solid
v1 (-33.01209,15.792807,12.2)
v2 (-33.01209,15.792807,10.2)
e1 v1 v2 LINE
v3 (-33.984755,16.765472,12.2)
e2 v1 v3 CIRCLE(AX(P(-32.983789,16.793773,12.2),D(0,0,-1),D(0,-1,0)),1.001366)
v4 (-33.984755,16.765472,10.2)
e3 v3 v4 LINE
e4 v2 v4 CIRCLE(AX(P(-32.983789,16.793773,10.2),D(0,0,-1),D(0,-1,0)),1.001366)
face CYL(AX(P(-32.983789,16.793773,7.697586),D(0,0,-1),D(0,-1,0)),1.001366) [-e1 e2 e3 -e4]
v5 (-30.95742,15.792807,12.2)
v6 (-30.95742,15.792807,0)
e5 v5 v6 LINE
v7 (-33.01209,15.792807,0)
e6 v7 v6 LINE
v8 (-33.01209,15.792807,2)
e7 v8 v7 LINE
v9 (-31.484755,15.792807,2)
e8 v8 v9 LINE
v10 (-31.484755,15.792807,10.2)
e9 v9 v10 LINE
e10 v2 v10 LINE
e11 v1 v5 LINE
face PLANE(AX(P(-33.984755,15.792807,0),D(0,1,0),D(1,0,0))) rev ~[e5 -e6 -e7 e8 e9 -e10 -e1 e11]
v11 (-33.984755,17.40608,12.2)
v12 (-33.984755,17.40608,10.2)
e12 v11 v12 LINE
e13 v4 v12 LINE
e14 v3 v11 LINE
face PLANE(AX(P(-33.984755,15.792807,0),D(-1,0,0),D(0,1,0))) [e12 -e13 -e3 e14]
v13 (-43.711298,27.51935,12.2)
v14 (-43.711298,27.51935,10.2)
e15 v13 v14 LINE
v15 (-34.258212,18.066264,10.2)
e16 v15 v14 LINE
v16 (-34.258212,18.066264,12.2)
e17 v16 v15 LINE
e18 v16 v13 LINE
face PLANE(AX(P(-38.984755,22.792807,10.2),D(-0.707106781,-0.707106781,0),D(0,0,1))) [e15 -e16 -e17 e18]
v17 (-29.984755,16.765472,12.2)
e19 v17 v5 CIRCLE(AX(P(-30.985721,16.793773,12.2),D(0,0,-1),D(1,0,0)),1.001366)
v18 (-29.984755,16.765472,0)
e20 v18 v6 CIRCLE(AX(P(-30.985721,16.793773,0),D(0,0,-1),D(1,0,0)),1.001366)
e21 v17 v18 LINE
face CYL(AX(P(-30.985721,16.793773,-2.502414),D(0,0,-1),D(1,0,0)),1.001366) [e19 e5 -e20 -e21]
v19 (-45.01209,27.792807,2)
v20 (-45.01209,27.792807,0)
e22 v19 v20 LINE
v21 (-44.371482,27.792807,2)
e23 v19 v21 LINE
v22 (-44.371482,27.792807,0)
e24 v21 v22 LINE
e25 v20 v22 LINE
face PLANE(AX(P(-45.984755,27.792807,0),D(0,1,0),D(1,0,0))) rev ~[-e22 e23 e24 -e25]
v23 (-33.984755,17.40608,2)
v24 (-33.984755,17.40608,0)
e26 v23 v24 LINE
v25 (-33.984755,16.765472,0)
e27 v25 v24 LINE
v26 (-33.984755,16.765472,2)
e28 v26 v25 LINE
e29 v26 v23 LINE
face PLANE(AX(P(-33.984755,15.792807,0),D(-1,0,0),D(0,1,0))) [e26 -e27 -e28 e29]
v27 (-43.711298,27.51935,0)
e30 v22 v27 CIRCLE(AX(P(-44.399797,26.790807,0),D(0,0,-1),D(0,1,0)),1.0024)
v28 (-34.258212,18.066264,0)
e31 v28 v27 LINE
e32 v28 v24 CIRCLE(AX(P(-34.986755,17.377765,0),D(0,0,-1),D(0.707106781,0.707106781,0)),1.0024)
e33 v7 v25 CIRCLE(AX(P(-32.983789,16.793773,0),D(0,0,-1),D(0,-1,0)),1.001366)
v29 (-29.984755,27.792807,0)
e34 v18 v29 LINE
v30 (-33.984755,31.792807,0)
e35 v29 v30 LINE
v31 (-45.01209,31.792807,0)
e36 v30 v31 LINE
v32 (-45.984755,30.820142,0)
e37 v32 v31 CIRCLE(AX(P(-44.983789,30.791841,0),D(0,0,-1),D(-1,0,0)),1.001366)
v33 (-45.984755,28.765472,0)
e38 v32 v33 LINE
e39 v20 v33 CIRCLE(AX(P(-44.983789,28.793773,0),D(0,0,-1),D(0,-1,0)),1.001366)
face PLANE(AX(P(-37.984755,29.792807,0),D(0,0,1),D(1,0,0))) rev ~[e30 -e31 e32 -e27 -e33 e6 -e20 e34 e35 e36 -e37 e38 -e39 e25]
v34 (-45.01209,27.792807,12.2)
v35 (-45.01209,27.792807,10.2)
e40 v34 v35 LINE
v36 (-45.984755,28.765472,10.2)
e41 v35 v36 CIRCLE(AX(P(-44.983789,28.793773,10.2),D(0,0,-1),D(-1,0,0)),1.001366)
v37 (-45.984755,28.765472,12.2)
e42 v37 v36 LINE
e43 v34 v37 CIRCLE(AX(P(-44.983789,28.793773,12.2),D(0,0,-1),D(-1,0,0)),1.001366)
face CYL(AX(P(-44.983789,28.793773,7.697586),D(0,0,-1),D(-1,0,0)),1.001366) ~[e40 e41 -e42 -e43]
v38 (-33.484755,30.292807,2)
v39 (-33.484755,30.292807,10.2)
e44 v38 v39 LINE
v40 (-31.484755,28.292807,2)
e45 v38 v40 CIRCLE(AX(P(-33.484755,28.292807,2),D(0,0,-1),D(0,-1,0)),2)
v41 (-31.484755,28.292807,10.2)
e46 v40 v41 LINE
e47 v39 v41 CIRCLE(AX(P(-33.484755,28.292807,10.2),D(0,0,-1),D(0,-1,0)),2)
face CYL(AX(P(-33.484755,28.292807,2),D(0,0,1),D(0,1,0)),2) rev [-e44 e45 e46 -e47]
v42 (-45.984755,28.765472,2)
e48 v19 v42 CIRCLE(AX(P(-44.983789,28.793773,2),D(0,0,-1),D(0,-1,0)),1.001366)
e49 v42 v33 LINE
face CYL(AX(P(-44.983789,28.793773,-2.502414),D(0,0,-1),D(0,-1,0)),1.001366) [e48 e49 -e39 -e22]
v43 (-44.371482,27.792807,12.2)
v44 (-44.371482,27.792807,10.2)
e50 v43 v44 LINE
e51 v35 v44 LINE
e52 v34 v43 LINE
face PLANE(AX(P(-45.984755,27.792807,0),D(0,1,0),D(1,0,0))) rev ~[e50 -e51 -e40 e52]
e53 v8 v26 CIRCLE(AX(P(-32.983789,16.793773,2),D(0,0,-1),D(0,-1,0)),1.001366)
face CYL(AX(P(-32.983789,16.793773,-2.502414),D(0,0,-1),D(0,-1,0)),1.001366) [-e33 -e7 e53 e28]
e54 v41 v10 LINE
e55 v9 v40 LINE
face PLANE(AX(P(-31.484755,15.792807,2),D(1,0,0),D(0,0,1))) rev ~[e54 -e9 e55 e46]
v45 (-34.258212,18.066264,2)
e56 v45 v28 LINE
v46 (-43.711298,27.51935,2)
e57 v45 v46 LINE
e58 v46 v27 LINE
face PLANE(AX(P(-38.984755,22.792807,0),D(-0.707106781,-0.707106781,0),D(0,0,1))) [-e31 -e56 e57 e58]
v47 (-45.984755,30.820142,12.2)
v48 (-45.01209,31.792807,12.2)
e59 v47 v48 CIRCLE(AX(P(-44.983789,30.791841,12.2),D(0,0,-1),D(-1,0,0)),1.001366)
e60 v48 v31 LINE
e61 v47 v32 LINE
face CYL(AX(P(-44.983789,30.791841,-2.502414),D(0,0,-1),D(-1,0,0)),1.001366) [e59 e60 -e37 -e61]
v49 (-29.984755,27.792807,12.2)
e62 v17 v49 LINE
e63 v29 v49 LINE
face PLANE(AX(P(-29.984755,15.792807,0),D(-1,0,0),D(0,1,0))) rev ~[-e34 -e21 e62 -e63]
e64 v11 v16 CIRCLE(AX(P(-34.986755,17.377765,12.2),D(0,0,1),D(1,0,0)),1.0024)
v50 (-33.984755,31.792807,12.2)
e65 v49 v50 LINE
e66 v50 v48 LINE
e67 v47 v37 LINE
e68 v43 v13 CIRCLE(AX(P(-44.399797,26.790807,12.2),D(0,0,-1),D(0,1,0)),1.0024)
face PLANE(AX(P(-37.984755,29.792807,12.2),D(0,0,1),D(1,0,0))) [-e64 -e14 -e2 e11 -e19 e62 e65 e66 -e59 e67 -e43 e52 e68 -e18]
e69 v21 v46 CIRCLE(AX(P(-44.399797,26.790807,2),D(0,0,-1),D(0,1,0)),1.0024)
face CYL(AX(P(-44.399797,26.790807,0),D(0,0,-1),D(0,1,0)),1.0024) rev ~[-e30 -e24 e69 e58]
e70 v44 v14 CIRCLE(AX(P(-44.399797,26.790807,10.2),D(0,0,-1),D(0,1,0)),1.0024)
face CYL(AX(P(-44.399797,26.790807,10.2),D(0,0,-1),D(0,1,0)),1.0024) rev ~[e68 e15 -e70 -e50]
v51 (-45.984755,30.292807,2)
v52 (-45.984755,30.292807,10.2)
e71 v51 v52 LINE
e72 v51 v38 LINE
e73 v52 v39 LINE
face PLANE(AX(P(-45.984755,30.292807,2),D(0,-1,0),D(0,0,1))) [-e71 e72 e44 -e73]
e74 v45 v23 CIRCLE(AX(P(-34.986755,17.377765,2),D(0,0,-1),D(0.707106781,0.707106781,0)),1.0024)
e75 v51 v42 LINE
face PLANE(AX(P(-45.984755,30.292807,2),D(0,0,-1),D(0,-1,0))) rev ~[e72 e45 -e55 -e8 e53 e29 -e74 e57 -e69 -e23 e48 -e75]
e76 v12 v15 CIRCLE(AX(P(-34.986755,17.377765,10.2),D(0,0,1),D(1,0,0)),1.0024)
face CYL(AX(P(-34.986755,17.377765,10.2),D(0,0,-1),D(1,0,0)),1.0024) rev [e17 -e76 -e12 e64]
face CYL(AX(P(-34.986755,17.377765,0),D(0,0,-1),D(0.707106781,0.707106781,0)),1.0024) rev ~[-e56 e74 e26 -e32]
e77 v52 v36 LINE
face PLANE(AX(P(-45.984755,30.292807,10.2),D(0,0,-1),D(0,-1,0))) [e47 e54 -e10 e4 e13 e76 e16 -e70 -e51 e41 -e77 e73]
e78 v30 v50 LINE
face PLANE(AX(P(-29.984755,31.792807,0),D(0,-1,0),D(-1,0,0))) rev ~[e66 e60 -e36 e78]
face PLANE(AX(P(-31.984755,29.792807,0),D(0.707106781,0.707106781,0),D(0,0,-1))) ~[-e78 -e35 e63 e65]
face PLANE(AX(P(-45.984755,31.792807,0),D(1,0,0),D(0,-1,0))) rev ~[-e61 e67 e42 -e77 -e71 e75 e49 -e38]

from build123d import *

# Parameters (mm, degrees)
F0_W        = 4
F0_H        = 12
F1_DEPTH    = 12.2
F2_W        = 2.5
F2_H        = 8.2
F3_DEPTH    = 14.5
F4_W        = 2.5
F4_H        = 8.2
F5_DEPTH    = 13.2
F6_SIZE     = 10
F7_R        = 2
F8_SIZE     = 4
F9_T1_DEPTH = 2
F9_T3_DEPTH = 2
F9_T5_DEPTH = 7.0048288267
F9_T7_DEPTH = 17.2048288267
F9_T9_DEPTH = 7.0048288267


# Not quite as in the source:
# - a fillet or chamfer that OpenCascade refuses, or shapes differently, is made with other operations: its cross-section is extruded or revolved along the edge and cut away or added


with BuildPart() as f1:
    # F0 (on Top) → F1 (new body)
    with BuildSketch(Plane.XY):
        Polygon((-29.984754981, 31.7928069385), (-45.984754981, 31.7928069385), (-45.984754981, 27.7928069385), (-33.984754981, 27.7928069385), (-29.984754981, 27.7928069385), align=None)
        with Locations((-31.984754981, 21.7928069385)):
            Rectangle(F0_W, F0_H)
    extrude(amount=F1_DEPTH)

    # F2 (on face) → F3 (cut)
    with BuildSketch(Plane(origin=(-45.984754981, 0, 0), x_dir=(0, -1, 0), z_dir=(-1, 0, 0))):
        with Locations((-29.0428069385, 6.1)):
            Rectangle(F2_W, F2_H)
    extrude(amount=-F3_DEPTH, mode=Mode.SUBTRACT)

    # F4 (on face) → F5 (cut)
    with BuildSketch(Plane.XZ.offset(-15.7928069385)):
        with Locations((-32.734754981, 6.1)):
            Rectangle(F4_W, F4_H)
    extrude(amount=-F5_DEPTH, mode=Mode.SUBTRACT)

    # F6
    f6_edges = [f1.edges().sort_by_distance(p)[0] for p in [
        (-33.984755, 27.792807, 1),
        (-33.984755, 27.792807, 11.2),
    ]]
    chamfer(f6_edges, length=F6_SIZE)

    # F7
    f7_edges = [f1.edges().sort_by_distance(p)[0] for p in [
        (-31.484755, 30.292807, 6.1),
    ]]
    fillet(f7_edges, radius=F7_R)

    # F8
    f8_edges = [f1.edges().sort_by_distance(p)[0] for p in [
        (-29.984755, 31.792807, 6.1),
    ]]
    chamfer(f8_edges, length=F8_SIZE)

    # F9: fillet of radius 1 on 14 edges, made by hand

    # F9_s2 → F9_t1 (join)
    with BuildSketch(Plane.XY):
        with BuildLine():
            ThreePointArc((-44.3997969705, 27.7932069385), (-44.0161950979, 27.7169037819), (-43.690993133, 27.4996107759))
            Line((-43.690993133, 27.4996107759), (-43.6201127493, 27.5704911597))
            ThreePointArc((-43.6201127493, 27.5704911597), (-43.7671350946, 27.7169478196), (-43.9138745973, 27.8636873222))
            Line((-43.9138745973, 27.8636873222), (-43.984754981, 27.8930469385))
            ThreePointArc((-43.984754981, 27.8930469385), (-44.1922759758, 27.8930469385), (-44.3997969705, 27.8934469385))
            Line((-44.3997969705, 27.8934469385), (-44.3997969705, 27.7932069385))
        make_face()
        with BuildLine():
            ThreePointArc((-34.2779511435, 18.0865687864), (-34.0606581376, 17.7613668216), (-33.984354981, 17.377764949))
            Line((-33.984354981, 17.377764949), (-33.884114981, 17.377764949))
            ThreePointArc((-33.884114981, 17.377764949), (-33.884514981, 17.5852859437), (-33.884514981, 17.7928069385))
            Line((-33.884514981, 17.7928069385), (-33.9138745973, 17.8636873222))
            ThreePointArc((-33.9138745973, 17.8636873222), (-34.0606140999, 18.0104268249), (-34.2070707598, 18.1574491702))
            Line((-34.2070707598, 18.1574491702), (-34.2779511435, 18.0865687864))
        make_face()
    extrude(amount=F9_T1_DEPTH)

    # F9_s4 → F9_t3 (join)
    with BuildSketch(Plane.XY.offset(10.2)):
        with BuildLine():
            ThreePointArc((-44.3997969705, 27.7932069385), (-44.0161950979, 27.7169037819), (-43.690993133, 27.4996107759))
            Line((-43.690993133, 27.4996107759), (-43.6201127493, 27.5704911597))
            ThreePointArc((-43.6201127493, 27.5704911597), (-43.7671350946, 27.7169478196), (-43.9138745973, 27.8636873222))
            Line((-43.9138745973, 27.8636873222), (-43.984754981, 27.8930469385))
            ThreePointArc((-43.984754981, 27.8930469385), (-44.1922759758, 27.8930469385), (-44.3997969705, 27.8934469385))
            Line((-44.3997969705, 27.8934469385), (-44.3997969705, 27.7932069385))
        make_face()
        with BuildLine():
            ThreePointArc((-33.984354981, 17.377764949), (-34.0606581376, 17.7613668216), (-34.2779511435, 18.0865687864))
            Line((-34.2779511435, 18.0865687864), (-34.2070707598, 18.1574491702))
            ThreePointArc((-34.2070707598, 18.1574491702), (-34.0606140999, 18.0104268249), (-33.9138745973, 17.8636873222))
            Line((-33.9138745973, 17.8636873222), (-33.884514981, 17.7928069385))
            ThreePointArc((-33.884514981, 17.7928069385), (-33.884514981, 17.5852859437), (-33.884114981, 17.377764949))
            Line((-33.884114981, 17.377764949), (-33.984354981, 17.377764949))
        make_face()
    extrude(amount=F9_T3_DEPTH)

    # F9_s6 → F9_t5 (cut)
    with BuildSketch(Plane.XY.offset(7.6975855866)):
        with BuildLine():
            ThreePointArc((-45.985154981, 28.7937726239), (-45.6918617622, 28.0857001573), (-44.9837892956, 27.7924069385))
            Line((-44.9837892956, 27.7924069385), (-44.9837892956, 27.6922703699))
            ThreePointArc((-44.9837892956, 27.6922703699), (-45.4842721383, 27.6926703699), (-45.984754981, 27.6926703699))
            Line((-45.984754981, 27.6926703699), (-46.0848915495, 27.7928069385))
            ThreePointArc((-46.0848915495, 27.7928069385), (-46.0848915495, 28.2932897812), (-46.0852915495, 28.7937726239))
            Line((-46.0852915495, 28.7937726239), (-45.985154981, 28.7937726239))
        make_face()
        with BuildLine():
            ThreePointArc((-32.9837892956, 15.7924069385), (-33.6918617622, 16.0857001573), (-33.985154981, 16.7937726239))
            Line((-33.985154981, 16.7937726239), (-34.0852915495, 16.7937726239))
            ThreePointArc((-34.0852915495, 16.7937726239), (-34.0848915495, 16.2932897812), (-34.0848915495, 15.7928069385))
            Line((-34.0848915495, 15.7928069385), (-33.984754981, 15.6926703699))
            ThreePointArc((-33.984754981, 15.6926703699), (-33.4842721383, 15.6926703699), (-32.9837892956, 15.6922703699))
            Line((-32.9837892956, 15.6922703699), (-32.9837892956, 15.7924069385))
        make_face()
    extrude(amount=F9_T5_DEPTH, mode=Mode.SUBTRACT)

    # F9_s8 → F9_t7 (cut)
    with BuildSketch(Plane.XY.offset(-2.5024144134)):
        with BuildLine():
            ThreePointArc((-29.984354981, 16.7937726239), (-30.2776481998, 16.0857001573), (-30.9857206664, 15.7924069385))
            Line((-30.9857206664, 15.7924069385), (-30.9857206664, 15.6922703699))
            ThreePointArc((-30.9857206664, 15.6922703699), (-30.4852378237, 15.6926703699), (-29.984754981, 15.6926703699))
            Line((-29.984754981, 15.6926703699), (-29.8846184125, 15.7928069385))
            ThreePointArc((-29.8846184125, 15.7928069385), (-29.8846184125, 16.2932897812), (-29.8842184125, 16.7937726239))
            Line((-29.8842184125, 16.7937726239), (-29.984354981, 16.7937726239))
        make_face()
        with BuildLine():
            ThreePointArc((-45.985154981, 30.7918412531), (-45.6918617622, 31.4999137197), (-44.9837892956, 31.7932069385))
            Line((-44.9837892956, 31.7932069385), (-44.9837892956, 31.893343507))
            ThreePointArc((-44.9837892956, 31.893343507), (-45.4842721383, 31.892943507), (-45.984754981, 31.892943507))
            Line((-45.984754981, 31.892943507), (-46.0848915495, 31.7928069385))
            ThreePointArc((-46.0848915495, 31.7928069385), (-46.0848915495, 31.2923240958), (-46.0852915495, 30.7918412531))
            Line((-46.0852915495, 30.7918412531), (-45.985154981, 30.7918412531))
        make_face()
    extrude(amount=F9_T7_DEPTH, mode=Mode.SUBTRACT)

    # F9_s10 → F9_t9 (cut)
    with BuildSketch(Plane.XY.offset(-2.5024144134)):
        with BuildLine():
            ThreePointArc((-32.9837892956, 15.7924069385), (-33.6918617622, 16.0857001573), (-33.985154981, 16.7937726239))
            Line((-33.985154981, 16.7937726239), (-34.0852915495, 16.7937726239))
            ThreePointArc((-34.0852915495, 16.7937726239), (-34.0848915495, 16.2932897812), (-34.0848915495, 15.7928069385))
            Line((-34.0848915495, 15.7928069385), (-33.984754981, 15.6926703699))
            ThreePointArc((-33.984754981, 15.6926703699), (-33.4842721383, 15.6926703699), (-32.9837892956, 15.6922703699))
            Line((-32.9837892956, 15.6922703699), (-32.9837892956, 15.7924069385))
        make_face()
        with BuildLine():
            ThreePointArc((-44.9837892956, 27.7924069385), (-45.6918617622, 28.0857001573), (-45.985154981, 28.7937726239))
            Line((-45.985154981, 28.7937726239), (-46.0852915495, 28.7937726239))
            ThreePointArc((-46.0852915495, 28.7937726239), (-46.0848915495, 28.2932897812), (-46.0848915495, 27.7928069385))
            Line((-46.0848915495, 27.7928069385), (-45.984754981, 27.6926703699))
            ThreePointArc((-45.984754981, 27.6926703699), (-45.4842721383, 27.6926703699), (-44.9837892956, 27.6922703699))
            Line((-44.9837892956, 27.6922703699), (-44.9837892956, 27.7924069385))
        make_face()
    extrude(amount=F9_T9_DEPTH, mode=Mode.SUBTRACT)


solid = f1.part
